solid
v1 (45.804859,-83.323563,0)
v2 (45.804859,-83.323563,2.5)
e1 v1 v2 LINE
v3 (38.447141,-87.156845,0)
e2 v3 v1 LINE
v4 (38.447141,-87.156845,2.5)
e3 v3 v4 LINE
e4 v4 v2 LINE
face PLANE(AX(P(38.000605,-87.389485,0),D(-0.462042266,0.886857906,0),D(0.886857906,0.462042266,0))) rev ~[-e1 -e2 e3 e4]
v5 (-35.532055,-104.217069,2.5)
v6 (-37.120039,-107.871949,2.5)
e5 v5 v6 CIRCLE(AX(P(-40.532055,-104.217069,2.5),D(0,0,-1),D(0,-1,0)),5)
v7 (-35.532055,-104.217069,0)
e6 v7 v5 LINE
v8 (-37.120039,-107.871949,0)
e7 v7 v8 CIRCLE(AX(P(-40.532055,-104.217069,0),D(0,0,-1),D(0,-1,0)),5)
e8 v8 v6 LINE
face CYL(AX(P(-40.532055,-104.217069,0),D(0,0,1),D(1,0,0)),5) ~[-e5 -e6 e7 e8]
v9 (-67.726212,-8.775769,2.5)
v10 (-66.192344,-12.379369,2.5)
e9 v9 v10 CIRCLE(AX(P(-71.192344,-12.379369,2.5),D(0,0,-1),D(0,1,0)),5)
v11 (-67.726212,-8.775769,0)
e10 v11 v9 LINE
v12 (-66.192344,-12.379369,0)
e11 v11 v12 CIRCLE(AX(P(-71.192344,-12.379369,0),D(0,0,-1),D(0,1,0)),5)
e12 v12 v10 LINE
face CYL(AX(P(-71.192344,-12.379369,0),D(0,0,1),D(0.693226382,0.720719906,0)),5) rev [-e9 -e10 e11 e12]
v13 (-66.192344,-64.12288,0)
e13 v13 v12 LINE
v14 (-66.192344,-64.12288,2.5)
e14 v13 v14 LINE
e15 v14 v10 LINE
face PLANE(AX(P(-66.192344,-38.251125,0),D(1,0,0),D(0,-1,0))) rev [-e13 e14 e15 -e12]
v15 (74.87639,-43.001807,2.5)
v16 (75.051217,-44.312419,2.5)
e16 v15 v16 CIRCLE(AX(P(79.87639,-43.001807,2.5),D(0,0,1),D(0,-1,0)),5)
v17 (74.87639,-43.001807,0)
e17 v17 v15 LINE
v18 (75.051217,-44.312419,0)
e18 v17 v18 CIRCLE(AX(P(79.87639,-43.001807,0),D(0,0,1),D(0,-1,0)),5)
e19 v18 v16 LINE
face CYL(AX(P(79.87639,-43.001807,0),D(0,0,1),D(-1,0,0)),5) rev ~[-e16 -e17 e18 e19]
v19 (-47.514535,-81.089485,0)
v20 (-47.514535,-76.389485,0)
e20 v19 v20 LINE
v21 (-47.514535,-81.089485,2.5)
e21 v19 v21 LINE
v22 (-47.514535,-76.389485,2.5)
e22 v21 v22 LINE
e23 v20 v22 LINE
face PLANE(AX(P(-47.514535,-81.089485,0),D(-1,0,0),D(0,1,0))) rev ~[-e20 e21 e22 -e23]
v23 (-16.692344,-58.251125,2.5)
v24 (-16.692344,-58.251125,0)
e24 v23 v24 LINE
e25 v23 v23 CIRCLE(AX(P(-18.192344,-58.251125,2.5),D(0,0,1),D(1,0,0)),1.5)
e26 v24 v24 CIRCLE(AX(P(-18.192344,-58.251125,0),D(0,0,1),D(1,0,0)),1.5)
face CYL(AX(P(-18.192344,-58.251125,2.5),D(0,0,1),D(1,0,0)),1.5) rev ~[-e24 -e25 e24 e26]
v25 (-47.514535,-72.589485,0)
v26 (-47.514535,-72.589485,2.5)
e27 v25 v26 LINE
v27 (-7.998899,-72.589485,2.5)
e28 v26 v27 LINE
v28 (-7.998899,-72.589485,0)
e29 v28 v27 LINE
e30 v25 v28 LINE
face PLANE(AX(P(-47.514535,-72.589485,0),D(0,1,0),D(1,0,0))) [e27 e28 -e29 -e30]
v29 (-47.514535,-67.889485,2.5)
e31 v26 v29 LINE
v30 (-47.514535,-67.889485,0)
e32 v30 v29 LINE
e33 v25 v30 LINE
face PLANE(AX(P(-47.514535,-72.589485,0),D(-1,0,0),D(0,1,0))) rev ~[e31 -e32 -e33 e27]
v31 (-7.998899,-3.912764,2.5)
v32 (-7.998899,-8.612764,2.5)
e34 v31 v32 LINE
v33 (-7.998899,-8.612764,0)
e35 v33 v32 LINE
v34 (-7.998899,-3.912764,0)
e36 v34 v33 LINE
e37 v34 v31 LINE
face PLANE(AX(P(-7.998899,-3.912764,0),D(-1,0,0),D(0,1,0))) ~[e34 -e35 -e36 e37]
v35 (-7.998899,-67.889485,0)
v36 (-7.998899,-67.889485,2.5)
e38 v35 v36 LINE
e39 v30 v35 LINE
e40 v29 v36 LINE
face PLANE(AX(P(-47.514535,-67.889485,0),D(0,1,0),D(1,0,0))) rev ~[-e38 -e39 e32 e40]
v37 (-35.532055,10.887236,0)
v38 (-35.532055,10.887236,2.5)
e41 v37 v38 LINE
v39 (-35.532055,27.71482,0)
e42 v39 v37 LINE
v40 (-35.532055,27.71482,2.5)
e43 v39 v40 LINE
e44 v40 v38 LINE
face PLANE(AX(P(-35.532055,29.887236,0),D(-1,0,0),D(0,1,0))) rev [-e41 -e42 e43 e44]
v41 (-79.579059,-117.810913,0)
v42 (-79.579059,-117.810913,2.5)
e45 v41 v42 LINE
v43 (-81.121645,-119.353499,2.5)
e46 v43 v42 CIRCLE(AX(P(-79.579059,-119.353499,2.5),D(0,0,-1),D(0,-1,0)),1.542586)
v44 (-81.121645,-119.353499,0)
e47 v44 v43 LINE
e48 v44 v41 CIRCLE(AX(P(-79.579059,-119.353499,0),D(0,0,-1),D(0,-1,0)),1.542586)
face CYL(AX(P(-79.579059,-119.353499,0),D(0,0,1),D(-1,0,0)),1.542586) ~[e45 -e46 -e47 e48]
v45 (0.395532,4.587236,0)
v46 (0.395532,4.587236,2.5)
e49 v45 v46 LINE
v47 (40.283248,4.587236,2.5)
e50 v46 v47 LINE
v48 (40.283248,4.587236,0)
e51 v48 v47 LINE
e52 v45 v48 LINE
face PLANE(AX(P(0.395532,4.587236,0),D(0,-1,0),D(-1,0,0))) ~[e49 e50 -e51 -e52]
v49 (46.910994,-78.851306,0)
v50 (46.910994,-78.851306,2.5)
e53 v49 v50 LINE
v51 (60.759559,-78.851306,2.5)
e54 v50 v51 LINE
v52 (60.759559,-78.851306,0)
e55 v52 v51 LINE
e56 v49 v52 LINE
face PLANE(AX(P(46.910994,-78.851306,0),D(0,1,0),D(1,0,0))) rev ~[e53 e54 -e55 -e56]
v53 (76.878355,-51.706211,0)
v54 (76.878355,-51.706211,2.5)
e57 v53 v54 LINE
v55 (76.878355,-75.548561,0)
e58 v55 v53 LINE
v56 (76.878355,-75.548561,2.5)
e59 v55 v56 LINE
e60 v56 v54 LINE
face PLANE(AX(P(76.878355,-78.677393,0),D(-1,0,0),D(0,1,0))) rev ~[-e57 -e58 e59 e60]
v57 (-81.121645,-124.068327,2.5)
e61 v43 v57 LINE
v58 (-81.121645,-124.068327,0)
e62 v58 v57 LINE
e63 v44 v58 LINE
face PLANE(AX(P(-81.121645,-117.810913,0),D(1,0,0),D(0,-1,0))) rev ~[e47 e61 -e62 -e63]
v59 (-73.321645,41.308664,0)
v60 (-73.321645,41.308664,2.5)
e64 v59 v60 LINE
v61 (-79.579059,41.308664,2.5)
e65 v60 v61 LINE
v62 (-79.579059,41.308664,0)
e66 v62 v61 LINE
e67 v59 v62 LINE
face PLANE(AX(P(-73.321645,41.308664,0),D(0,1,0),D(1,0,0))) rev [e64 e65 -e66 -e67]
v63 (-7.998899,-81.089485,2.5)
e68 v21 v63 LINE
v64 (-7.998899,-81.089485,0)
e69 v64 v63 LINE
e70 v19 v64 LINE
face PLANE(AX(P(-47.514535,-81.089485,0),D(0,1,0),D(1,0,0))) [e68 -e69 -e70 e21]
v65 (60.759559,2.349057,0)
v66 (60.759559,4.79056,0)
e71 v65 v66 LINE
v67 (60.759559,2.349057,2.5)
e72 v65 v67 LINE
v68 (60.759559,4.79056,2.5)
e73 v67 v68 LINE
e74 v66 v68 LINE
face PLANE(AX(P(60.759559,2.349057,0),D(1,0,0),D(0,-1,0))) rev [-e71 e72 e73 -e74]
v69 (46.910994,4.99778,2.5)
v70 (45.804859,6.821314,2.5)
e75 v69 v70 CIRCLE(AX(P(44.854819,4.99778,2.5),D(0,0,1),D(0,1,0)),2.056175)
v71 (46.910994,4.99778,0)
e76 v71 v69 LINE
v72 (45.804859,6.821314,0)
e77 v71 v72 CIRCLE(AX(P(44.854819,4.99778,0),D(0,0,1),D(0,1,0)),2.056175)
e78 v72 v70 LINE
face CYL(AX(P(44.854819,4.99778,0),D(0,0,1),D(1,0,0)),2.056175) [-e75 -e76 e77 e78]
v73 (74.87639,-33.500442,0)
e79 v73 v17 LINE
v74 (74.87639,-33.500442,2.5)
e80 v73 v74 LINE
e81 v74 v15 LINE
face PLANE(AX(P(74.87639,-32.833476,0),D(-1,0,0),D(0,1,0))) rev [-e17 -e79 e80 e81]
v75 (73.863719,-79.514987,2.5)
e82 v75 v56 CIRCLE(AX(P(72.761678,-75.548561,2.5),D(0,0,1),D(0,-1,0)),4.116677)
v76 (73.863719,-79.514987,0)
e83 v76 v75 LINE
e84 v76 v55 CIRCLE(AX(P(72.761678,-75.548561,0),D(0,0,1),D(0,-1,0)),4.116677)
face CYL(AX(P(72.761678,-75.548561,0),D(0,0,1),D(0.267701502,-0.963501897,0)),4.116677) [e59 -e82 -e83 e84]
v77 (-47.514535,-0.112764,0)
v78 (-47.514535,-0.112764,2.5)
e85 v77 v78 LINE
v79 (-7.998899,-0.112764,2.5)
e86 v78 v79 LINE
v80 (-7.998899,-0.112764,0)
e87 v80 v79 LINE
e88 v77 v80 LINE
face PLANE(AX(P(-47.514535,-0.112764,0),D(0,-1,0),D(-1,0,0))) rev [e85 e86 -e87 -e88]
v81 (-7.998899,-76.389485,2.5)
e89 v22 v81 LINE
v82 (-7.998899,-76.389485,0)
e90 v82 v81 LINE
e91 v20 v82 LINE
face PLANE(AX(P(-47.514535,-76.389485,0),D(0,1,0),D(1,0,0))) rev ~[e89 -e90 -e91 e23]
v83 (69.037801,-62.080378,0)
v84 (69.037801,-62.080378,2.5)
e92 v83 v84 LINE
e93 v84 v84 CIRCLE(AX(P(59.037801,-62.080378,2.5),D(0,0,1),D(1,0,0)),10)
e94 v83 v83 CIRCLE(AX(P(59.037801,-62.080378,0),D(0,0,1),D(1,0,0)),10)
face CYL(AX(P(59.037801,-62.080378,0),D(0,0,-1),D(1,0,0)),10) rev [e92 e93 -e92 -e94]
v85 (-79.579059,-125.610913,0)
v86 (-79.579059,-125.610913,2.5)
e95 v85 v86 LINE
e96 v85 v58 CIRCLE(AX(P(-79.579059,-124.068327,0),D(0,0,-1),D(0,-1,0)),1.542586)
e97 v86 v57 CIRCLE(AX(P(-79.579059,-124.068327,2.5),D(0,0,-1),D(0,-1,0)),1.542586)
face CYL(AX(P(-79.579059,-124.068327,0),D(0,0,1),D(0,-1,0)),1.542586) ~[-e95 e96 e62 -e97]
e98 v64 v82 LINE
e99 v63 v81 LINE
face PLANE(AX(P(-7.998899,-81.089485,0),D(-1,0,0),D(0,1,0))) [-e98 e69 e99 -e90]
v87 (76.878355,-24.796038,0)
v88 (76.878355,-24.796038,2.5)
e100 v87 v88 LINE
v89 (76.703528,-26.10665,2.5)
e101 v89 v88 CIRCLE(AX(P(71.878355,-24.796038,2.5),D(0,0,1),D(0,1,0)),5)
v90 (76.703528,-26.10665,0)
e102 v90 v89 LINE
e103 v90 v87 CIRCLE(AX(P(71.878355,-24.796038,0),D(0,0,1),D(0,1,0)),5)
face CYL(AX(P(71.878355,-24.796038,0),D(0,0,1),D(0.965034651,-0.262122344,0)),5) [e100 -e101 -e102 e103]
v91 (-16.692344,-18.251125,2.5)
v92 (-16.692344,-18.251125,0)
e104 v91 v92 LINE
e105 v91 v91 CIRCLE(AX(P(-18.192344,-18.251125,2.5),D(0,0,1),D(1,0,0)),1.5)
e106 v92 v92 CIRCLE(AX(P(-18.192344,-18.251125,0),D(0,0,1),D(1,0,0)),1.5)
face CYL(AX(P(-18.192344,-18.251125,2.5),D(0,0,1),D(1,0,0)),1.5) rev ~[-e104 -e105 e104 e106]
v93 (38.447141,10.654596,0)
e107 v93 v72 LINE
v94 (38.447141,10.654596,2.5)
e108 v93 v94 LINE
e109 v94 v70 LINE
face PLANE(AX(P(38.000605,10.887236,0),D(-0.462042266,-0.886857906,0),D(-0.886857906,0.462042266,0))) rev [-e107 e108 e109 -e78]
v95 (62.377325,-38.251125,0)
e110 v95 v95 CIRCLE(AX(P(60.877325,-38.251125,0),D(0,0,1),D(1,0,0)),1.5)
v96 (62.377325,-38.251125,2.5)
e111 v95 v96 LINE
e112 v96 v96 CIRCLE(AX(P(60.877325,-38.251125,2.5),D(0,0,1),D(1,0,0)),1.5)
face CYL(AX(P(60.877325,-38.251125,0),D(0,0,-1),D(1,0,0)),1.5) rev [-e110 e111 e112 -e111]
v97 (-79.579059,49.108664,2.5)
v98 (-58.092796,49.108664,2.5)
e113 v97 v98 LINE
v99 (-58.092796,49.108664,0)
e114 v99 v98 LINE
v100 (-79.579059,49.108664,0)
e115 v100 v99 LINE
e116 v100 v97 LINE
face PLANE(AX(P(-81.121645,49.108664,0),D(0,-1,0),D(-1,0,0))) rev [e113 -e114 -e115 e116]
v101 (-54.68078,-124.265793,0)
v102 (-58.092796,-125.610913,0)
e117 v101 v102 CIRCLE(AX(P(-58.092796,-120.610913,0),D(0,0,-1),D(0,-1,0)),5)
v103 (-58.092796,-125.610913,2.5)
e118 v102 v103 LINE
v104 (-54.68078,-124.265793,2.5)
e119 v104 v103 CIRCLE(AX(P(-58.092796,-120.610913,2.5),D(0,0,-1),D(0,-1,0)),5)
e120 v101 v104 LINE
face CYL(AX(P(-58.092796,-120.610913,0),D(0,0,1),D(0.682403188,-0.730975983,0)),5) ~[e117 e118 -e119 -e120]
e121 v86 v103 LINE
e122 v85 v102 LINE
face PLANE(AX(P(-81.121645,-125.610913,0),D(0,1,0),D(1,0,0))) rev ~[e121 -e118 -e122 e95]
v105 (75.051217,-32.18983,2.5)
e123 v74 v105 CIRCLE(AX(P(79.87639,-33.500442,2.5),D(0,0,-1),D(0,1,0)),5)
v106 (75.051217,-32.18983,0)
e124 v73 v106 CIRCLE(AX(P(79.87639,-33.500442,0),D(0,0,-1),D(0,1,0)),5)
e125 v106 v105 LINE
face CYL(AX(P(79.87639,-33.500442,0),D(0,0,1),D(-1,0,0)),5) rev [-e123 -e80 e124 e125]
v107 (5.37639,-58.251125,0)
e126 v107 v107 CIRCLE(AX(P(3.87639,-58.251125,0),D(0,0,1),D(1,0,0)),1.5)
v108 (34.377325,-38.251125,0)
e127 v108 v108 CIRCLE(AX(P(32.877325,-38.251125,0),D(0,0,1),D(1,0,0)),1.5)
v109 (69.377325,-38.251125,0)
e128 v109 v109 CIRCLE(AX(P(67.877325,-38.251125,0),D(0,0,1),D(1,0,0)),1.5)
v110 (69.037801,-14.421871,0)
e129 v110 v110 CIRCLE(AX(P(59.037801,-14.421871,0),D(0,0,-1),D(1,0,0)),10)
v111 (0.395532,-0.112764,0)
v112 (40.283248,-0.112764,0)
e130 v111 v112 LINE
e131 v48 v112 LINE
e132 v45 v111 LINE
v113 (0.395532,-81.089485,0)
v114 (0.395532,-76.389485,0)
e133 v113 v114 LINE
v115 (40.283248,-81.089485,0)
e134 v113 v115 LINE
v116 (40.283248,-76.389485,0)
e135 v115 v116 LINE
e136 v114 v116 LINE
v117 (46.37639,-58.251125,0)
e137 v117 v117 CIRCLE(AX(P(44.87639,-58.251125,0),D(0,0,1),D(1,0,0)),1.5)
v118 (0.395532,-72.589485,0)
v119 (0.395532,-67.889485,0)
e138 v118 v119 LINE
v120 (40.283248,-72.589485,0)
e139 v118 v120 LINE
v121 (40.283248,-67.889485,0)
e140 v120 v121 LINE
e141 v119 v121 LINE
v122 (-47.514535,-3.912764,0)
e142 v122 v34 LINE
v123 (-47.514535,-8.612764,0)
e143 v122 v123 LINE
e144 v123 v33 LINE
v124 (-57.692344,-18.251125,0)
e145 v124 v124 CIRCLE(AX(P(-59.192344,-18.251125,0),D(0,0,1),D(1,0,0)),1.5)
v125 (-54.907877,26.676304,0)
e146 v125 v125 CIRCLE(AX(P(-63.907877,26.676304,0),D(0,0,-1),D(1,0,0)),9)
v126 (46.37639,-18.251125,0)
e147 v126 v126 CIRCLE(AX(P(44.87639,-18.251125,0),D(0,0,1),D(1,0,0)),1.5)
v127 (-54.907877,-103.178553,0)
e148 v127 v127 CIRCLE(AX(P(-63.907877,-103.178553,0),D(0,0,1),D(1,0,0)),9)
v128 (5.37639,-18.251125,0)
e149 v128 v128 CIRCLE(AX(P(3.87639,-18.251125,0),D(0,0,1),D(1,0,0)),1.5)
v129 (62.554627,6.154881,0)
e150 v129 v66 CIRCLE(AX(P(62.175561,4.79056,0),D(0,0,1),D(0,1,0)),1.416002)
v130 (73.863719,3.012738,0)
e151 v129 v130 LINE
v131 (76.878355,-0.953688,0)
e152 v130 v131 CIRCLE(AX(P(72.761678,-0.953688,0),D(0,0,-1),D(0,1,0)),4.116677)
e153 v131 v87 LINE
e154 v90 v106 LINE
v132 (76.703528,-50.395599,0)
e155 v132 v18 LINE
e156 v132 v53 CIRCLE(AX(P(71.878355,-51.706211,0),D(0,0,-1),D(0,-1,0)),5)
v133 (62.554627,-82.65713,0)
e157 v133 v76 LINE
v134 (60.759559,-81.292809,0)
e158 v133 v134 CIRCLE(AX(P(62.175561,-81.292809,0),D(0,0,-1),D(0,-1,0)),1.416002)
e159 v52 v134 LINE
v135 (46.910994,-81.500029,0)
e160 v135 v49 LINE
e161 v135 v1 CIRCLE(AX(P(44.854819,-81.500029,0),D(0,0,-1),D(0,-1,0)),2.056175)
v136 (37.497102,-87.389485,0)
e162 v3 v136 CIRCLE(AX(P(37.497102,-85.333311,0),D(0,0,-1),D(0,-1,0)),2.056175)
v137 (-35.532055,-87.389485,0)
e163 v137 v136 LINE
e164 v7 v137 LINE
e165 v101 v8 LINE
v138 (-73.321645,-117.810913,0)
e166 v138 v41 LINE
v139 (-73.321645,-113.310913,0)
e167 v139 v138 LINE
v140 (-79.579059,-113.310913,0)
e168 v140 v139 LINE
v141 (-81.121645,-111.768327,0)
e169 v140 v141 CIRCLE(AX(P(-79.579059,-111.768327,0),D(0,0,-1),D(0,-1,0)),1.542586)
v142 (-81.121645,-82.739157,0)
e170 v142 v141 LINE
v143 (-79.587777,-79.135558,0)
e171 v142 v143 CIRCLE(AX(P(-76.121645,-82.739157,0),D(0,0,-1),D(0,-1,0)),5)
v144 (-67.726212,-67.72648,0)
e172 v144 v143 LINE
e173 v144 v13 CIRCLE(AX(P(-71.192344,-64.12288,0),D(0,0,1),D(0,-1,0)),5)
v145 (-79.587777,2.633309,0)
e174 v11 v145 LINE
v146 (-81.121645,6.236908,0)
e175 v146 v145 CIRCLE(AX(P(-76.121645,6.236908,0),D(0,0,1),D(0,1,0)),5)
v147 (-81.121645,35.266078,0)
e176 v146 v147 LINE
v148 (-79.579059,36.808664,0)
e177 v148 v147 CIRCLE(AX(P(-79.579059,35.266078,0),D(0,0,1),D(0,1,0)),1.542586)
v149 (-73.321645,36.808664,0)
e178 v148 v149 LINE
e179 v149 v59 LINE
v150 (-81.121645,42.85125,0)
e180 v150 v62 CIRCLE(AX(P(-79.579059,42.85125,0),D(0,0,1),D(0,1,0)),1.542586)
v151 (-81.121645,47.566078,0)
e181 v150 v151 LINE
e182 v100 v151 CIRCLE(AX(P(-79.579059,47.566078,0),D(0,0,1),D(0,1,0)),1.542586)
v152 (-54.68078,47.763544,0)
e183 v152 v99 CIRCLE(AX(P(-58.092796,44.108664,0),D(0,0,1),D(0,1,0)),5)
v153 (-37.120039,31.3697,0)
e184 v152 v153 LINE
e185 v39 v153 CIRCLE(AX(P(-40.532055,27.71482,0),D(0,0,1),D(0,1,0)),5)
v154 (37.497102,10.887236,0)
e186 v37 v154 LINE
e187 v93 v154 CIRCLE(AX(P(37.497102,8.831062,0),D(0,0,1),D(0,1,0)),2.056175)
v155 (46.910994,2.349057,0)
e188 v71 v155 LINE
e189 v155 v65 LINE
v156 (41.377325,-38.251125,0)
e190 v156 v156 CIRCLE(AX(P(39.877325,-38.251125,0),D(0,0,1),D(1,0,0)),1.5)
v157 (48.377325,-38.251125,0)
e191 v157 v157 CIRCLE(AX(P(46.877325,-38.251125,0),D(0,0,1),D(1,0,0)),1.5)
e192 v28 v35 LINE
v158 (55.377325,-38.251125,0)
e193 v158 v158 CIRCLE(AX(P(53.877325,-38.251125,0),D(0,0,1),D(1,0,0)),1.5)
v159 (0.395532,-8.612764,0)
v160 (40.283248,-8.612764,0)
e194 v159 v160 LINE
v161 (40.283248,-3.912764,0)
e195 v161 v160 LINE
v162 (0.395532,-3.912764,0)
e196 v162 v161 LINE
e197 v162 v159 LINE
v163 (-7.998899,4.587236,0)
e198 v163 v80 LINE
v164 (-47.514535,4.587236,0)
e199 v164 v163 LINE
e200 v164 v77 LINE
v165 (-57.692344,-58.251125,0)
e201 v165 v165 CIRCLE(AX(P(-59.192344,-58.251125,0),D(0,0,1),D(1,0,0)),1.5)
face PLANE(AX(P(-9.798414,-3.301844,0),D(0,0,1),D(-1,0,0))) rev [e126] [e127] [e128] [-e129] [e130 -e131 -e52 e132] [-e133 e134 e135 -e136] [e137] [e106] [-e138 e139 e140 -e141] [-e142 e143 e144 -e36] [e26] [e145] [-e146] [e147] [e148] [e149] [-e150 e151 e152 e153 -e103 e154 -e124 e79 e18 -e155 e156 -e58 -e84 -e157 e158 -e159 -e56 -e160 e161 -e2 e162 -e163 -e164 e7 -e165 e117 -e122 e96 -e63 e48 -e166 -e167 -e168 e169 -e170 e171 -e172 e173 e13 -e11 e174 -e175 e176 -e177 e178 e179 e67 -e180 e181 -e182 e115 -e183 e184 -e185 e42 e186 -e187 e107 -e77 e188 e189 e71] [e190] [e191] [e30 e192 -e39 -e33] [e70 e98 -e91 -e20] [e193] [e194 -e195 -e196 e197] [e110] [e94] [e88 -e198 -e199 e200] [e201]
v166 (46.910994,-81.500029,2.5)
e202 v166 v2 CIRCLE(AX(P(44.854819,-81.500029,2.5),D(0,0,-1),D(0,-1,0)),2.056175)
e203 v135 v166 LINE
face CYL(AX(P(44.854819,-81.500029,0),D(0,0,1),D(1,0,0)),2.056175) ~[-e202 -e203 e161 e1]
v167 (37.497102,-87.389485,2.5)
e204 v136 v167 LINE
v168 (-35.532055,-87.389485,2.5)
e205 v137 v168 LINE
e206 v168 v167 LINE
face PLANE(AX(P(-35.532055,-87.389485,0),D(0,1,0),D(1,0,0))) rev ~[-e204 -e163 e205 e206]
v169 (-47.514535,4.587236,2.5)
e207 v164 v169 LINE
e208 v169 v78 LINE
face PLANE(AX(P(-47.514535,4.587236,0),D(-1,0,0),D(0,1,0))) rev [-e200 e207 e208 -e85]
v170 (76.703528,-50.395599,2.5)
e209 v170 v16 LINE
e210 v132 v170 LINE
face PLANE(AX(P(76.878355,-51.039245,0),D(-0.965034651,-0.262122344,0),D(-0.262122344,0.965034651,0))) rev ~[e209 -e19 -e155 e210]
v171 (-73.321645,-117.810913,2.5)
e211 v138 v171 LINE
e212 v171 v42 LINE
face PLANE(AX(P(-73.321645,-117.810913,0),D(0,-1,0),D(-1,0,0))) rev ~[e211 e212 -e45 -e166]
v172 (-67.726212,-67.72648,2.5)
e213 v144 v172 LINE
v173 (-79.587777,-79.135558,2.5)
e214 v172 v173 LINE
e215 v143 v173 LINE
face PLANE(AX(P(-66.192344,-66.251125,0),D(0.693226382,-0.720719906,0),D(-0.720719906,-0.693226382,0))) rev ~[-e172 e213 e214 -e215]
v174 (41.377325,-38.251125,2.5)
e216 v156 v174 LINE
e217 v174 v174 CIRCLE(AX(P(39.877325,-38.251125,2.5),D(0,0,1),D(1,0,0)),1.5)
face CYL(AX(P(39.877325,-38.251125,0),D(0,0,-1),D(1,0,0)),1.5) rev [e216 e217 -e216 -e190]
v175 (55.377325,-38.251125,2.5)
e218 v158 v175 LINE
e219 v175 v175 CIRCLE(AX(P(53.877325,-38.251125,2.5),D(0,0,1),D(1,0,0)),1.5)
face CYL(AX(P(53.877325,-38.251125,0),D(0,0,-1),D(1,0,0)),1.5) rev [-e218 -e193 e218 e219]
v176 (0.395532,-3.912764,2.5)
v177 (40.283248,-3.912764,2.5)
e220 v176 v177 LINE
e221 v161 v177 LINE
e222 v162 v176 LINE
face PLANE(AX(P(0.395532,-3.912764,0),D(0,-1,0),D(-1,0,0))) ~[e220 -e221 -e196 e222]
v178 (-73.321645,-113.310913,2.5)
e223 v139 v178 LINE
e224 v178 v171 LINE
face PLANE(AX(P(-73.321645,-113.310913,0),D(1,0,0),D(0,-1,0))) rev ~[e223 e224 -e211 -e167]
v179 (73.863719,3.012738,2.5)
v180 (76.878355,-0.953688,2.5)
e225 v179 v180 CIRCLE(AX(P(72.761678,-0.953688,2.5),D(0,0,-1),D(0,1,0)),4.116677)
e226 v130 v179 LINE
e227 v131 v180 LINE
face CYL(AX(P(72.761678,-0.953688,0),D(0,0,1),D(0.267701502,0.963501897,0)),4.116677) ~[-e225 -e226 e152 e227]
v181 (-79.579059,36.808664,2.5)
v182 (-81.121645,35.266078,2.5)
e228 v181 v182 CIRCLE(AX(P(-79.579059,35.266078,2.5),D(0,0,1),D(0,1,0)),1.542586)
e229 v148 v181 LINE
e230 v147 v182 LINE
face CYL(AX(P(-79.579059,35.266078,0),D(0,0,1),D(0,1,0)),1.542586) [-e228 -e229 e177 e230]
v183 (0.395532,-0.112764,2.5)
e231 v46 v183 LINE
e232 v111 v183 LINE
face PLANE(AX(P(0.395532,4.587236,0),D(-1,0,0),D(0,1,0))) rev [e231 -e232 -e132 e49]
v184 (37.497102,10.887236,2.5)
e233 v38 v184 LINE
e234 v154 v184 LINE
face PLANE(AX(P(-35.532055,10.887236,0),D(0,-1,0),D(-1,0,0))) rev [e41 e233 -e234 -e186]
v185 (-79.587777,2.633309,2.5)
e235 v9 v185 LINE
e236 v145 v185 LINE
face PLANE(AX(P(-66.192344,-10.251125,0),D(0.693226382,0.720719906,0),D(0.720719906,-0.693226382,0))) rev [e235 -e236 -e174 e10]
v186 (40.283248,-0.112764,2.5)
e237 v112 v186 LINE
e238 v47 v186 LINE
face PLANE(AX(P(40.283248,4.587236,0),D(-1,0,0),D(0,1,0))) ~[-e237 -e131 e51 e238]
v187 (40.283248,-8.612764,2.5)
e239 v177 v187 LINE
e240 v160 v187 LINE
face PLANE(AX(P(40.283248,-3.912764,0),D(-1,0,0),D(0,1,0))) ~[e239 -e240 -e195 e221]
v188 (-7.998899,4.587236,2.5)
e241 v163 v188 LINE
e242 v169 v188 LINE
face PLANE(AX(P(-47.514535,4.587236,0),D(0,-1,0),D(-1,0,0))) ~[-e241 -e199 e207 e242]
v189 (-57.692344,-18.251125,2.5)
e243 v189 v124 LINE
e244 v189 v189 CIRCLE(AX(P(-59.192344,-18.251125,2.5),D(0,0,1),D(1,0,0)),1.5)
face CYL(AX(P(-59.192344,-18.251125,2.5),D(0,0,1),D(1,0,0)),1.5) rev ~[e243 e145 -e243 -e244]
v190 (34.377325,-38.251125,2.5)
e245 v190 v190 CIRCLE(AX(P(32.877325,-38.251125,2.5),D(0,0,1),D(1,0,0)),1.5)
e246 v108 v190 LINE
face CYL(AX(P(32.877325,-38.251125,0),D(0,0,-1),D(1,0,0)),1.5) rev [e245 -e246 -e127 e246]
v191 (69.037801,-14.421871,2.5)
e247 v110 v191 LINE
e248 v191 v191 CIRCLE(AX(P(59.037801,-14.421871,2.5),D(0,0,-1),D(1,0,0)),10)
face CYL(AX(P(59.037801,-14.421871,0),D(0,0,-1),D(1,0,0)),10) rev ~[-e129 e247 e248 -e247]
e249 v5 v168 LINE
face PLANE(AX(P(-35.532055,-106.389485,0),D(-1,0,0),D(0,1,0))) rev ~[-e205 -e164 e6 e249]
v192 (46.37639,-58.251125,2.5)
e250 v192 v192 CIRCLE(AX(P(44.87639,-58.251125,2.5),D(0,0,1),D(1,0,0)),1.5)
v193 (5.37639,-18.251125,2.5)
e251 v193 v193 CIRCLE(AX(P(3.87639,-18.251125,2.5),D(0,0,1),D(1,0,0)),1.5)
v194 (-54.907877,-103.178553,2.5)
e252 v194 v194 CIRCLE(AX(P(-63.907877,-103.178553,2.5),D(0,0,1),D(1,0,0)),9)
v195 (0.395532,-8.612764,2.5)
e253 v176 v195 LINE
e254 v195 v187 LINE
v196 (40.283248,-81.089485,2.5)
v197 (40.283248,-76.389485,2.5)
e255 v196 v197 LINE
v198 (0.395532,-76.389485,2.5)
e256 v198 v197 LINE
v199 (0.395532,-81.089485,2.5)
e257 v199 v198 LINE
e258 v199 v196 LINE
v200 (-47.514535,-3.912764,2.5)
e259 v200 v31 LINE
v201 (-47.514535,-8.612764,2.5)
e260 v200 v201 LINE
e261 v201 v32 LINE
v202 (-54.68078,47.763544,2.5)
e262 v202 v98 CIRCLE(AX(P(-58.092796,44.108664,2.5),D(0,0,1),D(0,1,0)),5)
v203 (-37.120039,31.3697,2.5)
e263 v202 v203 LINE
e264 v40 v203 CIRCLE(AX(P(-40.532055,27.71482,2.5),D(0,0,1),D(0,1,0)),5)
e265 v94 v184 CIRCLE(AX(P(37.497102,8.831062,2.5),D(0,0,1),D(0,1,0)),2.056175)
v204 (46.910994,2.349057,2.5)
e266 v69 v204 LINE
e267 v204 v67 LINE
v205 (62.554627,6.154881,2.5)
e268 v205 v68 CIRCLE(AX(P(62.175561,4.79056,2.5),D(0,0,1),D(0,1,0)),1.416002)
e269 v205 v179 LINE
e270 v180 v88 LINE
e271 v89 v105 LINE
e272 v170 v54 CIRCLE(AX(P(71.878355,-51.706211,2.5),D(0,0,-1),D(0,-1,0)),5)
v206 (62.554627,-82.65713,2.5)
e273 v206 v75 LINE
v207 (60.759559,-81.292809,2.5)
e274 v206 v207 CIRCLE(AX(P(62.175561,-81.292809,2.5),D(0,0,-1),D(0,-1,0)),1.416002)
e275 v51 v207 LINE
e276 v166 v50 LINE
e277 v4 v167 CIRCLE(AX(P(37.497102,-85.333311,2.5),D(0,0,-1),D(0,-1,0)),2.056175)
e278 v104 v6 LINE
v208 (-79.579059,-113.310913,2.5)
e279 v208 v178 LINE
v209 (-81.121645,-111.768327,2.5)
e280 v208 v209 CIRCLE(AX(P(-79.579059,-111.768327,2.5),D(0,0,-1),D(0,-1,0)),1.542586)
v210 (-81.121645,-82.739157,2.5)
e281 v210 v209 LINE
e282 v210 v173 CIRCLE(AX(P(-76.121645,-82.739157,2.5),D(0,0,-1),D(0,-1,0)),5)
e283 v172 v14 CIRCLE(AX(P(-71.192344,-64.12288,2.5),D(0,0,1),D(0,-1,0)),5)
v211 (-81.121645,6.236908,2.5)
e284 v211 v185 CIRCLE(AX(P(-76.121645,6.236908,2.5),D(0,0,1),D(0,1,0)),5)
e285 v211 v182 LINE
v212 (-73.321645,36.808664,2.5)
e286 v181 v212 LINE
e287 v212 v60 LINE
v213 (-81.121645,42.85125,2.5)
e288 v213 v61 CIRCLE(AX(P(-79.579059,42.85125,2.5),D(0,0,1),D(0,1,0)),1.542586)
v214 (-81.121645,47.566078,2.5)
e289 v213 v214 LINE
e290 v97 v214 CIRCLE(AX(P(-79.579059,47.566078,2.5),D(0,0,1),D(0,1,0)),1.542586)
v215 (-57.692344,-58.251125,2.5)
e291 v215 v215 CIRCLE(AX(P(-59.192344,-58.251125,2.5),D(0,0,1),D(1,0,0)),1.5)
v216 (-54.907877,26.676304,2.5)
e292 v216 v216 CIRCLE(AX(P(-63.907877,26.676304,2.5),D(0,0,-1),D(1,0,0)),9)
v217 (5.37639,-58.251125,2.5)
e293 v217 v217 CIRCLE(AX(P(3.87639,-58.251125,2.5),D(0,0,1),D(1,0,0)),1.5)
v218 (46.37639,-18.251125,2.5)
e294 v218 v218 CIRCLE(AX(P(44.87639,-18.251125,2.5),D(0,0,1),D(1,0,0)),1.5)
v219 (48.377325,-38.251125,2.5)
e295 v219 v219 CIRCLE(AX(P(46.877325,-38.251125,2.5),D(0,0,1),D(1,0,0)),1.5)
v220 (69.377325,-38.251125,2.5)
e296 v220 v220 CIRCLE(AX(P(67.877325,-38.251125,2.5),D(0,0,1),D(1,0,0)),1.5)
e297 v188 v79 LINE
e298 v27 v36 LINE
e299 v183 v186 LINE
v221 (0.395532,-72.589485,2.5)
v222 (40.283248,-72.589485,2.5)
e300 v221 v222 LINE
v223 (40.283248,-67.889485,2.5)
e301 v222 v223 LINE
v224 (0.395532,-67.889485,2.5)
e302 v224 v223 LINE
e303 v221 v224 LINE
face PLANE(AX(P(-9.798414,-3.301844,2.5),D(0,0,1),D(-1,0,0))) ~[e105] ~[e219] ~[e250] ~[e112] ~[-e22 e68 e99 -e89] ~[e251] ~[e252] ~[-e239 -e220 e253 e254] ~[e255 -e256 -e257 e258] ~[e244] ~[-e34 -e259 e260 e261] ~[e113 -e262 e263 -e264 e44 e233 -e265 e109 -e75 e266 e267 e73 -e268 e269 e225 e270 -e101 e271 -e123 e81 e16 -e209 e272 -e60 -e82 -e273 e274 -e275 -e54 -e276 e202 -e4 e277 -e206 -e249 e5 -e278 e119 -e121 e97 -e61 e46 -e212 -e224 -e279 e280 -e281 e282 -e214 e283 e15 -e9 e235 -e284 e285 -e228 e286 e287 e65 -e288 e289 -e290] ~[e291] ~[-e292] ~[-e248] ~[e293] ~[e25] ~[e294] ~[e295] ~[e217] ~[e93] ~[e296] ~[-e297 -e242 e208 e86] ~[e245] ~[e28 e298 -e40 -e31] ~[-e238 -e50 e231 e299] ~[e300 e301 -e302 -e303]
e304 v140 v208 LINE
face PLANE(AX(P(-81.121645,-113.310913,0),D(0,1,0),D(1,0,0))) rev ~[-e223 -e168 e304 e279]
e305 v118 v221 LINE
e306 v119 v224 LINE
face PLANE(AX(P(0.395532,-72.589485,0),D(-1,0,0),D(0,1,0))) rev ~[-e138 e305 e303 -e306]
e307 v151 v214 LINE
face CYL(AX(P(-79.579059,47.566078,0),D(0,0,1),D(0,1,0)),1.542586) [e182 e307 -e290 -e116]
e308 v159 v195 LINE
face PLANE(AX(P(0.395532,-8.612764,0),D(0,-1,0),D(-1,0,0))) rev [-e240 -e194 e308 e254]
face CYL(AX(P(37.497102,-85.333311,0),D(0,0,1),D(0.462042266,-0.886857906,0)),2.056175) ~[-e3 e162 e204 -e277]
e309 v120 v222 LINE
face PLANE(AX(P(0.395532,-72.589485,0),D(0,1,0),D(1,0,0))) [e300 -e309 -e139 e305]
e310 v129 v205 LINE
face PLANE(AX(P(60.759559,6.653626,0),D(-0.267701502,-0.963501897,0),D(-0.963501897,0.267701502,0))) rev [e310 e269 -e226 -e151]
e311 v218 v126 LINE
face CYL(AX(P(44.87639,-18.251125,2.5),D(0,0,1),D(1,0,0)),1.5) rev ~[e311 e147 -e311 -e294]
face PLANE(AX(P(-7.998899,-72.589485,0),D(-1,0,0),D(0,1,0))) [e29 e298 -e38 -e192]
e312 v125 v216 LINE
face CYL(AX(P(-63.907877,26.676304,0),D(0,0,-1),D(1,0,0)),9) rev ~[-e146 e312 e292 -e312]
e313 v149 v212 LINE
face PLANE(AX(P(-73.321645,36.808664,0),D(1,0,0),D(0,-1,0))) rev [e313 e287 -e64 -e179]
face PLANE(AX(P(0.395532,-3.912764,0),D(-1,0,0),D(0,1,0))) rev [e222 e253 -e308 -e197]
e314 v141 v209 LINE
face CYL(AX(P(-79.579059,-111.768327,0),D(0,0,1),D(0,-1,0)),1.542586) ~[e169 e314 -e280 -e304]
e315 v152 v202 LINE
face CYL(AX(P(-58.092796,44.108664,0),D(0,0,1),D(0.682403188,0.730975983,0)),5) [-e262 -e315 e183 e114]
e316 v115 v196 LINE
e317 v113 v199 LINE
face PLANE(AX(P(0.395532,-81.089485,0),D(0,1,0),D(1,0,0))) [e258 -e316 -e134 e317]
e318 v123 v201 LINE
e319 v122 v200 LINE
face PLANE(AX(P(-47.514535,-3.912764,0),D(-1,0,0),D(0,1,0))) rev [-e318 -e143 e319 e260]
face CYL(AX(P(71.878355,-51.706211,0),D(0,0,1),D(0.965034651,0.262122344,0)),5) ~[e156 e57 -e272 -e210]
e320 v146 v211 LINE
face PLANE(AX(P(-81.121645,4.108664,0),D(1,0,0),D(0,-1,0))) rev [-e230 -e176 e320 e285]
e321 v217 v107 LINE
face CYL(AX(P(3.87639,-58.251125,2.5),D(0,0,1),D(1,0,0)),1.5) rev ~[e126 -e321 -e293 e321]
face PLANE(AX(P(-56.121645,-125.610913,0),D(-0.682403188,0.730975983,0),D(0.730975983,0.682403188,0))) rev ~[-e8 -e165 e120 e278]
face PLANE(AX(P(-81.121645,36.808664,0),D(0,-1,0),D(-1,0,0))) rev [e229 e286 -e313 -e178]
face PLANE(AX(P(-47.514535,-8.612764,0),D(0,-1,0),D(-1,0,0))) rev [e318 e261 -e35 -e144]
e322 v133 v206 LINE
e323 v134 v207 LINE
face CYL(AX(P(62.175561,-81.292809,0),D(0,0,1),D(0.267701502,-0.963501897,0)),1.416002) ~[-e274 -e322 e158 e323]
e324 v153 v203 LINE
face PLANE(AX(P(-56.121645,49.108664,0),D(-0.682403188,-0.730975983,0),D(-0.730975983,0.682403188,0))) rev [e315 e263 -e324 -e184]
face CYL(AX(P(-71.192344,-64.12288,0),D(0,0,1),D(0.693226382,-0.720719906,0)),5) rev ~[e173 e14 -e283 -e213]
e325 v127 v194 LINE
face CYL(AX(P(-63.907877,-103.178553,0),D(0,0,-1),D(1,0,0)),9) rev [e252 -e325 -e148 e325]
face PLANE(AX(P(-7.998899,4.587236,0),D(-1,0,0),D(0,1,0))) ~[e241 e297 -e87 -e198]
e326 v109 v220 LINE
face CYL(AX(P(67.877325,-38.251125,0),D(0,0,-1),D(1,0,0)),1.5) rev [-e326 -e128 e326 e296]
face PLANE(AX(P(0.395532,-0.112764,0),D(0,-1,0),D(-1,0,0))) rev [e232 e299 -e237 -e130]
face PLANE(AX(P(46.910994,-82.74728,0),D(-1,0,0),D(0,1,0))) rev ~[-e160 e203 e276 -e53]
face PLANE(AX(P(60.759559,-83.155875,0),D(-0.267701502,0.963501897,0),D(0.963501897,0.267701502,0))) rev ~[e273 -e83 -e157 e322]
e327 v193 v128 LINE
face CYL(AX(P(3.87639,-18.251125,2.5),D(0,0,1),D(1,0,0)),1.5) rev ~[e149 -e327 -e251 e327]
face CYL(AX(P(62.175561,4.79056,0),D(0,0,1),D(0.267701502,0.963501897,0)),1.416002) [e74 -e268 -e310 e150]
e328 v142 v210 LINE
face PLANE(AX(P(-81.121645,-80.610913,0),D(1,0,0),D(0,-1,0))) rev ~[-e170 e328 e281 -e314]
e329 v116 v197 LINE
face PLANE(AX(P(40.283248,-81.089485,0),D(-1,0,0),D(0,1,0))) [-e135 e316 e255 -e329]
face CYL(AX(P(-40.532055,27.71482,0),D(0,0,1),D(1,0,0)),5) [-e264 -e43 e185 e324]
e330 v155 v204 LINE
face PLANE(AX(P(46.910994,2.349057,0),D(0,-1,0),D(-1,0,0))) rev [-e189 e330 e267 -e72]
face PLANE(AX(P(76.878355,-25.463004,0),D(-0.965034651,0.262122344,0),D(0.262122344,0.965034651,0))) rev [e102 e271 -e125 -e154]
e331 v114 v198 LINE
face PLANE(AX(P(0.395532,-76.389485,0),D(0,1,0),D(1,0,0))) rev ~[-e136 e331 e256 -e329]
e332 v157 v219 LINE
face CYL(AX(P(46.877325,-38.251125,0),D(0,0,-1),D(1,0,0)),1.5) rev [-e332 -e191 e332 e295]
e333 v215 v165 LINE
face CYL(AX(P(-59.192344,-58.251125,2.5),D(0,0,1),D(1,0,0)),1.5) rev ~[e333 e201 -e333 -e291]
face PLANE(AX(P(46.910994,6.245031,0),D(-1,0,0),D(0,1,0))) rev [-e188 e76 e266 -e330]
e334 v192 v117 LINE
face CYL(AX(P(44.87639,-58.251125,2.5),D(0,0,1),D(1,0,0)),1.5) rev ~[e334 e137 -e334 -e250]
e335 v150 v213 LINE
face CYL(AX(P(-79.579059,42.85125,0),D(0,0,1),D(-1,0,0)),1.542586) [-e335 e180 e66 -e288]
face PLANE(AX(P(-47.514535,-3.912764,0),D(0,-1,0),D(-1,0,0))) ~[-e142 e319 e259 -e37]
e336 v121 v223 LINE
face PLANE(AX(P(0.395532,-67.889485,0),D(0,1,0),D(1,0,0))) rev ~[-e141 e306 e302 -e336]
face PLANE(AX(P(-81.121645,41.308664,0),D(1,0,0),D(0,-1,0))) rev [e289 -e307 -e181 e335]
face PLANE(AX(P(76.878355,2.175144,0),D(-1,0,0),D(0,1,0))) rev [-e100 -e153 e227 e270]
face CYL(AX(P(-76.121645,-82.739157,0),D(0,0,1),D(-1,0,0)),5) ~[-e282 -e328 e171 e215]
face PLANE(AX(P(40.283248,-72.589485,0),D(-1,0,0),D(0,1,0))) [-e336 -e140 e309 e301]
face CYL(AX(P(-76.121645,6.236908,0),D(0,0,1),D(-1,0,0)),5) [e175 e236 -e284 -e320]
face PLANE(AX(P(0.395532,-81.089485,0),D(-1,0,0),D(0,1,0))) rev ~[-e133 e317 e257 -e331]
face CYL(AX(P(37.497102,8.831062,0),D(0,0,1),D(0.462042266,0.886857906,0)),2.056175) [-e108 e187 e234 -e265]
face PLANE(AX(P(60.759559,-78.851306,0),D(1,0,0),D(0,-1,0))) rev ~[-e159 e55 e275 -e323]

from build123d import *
from build123d import SkipClean  # not in build123d's __all__

# Parameters (mm, degrees)
F0_R      = 9
F0_W      = 39.5156368613
F0_H      = 4.7
F0_W_2    = 39.887715684
F0_R_2    = 10
F1_DEPTH  = 2.5
F2_R      = 1.4160019586
F3_R      = 4.1166770091
F4_R      = 2.0561745665
F5_R      = 5
F6_R      = 1.5425858978
F7_R      = 5
F8_R      = 5
F10_R     = 1.5
F11_DEPTH = 25


with BuildPart() as f1:
    # F0 (on Top) → F1 (new body)
    with BuildSketch(Plane.XY):
        with BuildLine():
            Line((74.8763903975, -38.2511245025), (69.3773250177, -38.2511245025))
            ThreePointArc((69.3773250177, -38.2511245025), (67.8773250177, -39.7511245025), (66.3773250177, -38.2511245025))
            Line((66.3773250177, -38.2511245025), (62.3773250177, -38.2511245025))
            ThreePointArc((62.3773250177, -38.2511245025), (60.8773250177, -39.7511245025), (59.3773250177, -38.2511245025))
            Line((59.3773250177, -38.2511245025), (55.3773250177, -38.2511245025))
            ThreePointArc((55.3773250177, -38.2511245025), (53.8773250177, -39.7511245025), (52.3773250177, -38.2511245025))
            Line((52.3773250177, -38.2511245025), (48.3773250177, -38.2511245025))
            ThreePointArc((48.3773250177, -38.2511245025), (46.8773250177, -39.7511245025), (45.3773250177, -38.2511245025))
            Line((45.3773250177, -38.2511245025), (41.3773250177, -38.2511245025))
            ThreePointArc((41.3773250177, -38.2511245025), (39.8773250177, -39.7511245025), (38.3773250177, -38.2511245025))
            Line((38.3773250177, -38.2511245025), (34.3773250177, -38.2511245025))
            ThreePointArc((34.3773250177, -38.2511245025), (32.8773250177, -39.7511245025), (31.3773250177, -38.2511245025))
            Line((31.3773250177, -38.2511245025), (-66.1923438311, -38.2511245025))
            Line((-66.1923438311, -38.2511245025), (-66.1923438311, -66.2511245025))
            Line((-66.1923438311, -66.2511245025), (-81.1216448216, -80.6109128623))
            Line((-81.1216448216, -80.6109128623), (-81.1216448216, -113.3109128623))
            Line((-81.1216448216, -113.3109128623), (-73.3216448216, -113.3109128623))
            Line((-73.3216448216, -113.3109128623), (-73.3216448216, -117.8109128623))
            Line((-73.3216448216, -117.8109128623), (-81.1216448216, -117.8109128623))
            Line((-81.1216448216, -117.8109128623), (-81.1216448216, -125.6109128623))
            Line((-81.1216448216, -125.6109128623), (-56.1216448216, -125.6109128623))
            Line((-56.1216448216, -125.6109128623), (-35.532054749, -106.3894852996))
            Line((-35.532054749, -106.3894852996), (-35.532054749, -87.3894852996))
            Line((-35.532054749, -87.3894852996), (38.0006051308, -87.3894852996))
            Line((38.0006051308, -87.3894852996), (46.9109937549, -82.7472803621))
            Line((46.9109937549, -82.7472803621), (46.9109937549, -78.8513062))
            Line((46.9109937549, -78.8513062), (60.7595592737, -78.8513062))
            Line((60.7595592737, -78.8513062), (60.7595592737, -83.155875459))
            Line((60.7595592737, -83.155875459), (76.8783551784, -78.677393496))
            Line((76.8783551784, -78.677393496), (76.8783551784, -51.0392449796))
            Line((76.8783551784, -51.0392449796), (74.8763903975, -43.6687730253))
            Line((74.8763903975, -43.6687730253), (74.8763903975, -38.2511245025))
        make_face()
        with Locations((-63.9078766108, -103.1785532832)):
            Circle(F0_R, mode=Mode.SUBTRACT)
        with Locations((-27.756717056, -78.7394852996)):
            Rectangle(F0_W, F0_H, mode=Mode.SUBTRACT)
        with Locations((-27.756717056, -70.2394852996)):
            Rectangle(F0_W, F0_H, mode=Mode.SUBTRACT)
        with Locations((20.3393899865, -78.7394852996)):
            Rectangle(F0_W_2, F0_H, mode=Mode.SUBTRACT)
        with Locations((20.3393899865, -70.2394852996)):
            Rectangle(F0_W_2, F0_H, mode=Mode.SUBTRACT)
        with Locations((59.0378009468, -62.0803784949)):
            Circle(F0_R_2, mode=Mode.SUBTRACT)
    extrude(amount=F1_DEPTH)

    # F2
    f2_edges = [f1.edges().sort_by_distance(p)[0] for p in [
        (60.759559, -83.155875, 1.25),
    ]]
    fillet(f2_edges, radius=F2_R)

    # F3
    f3_edges = [f1.edges().sort_by_distance(p)[0] for p in [
        (76.878355, -78.677393, 1.25),
    ]]
    fillet(f3_edges, radius=F3_R)

    # F4
    f4_edges = [f1.edges().sort_by_distance(p)[0] for p in [
        (46.910994, -82.74728, 1.25),
        (38.000605, -87.389485, 1.25),
    ]]
    fillet(f4_edges, radius=F4_R)

    # F5
    f5_edges = [f1.edges().sort_by_distance(p)[0] for p in [
        (-56.121645, -125.610913, 1.25),
        (-35.532055, -106.389485, 1.25),
    ]]
    fillet(f5_edges, radius=F5_R)

    # F6
    f6_edges = [f1.edges().sort_by_distance(p)[0] for p in [
        (-81.121645, -113.310913, 1.25),
        (-81.121645, -117.810913, 1.25),
        (-81.121645, -125.610913, 1.25),
    ]]
    fillet(f6_edges, radius=F6_R)

    # F7
    f7_edges = [f1.edges().sort_by_distance(p)[0] for p in [
        (-81.121645, -80.610913, 1.25),
        (-66.192344, -66.251125, 1.25),
    ]]
    fillet(f7_edges, radius=F7_R)

    # F8
    f8_edges = [f1.edges().sort_by_distance(p)[0] for p in [
        (76.878355, -51.039245, 1.25),
        (74.87639, -43.668773, 1.25),
    ]]
    fillet(f8_edges, radius=F8_R)

    # F9: F1 across face


with BuildPart() as f1_1:
    add(f1.part, clean=False)
    with SkipClean():  # cleaning this boolean's faces spoils the solid; the shape is the same uncleaned
        add(f1.part.mirror(Plane(origin=(-17.4075094067, -38.2511245025, 1.25), x_dir=(-1, 0, 0), z_dir=(0, 1, 0))), clean=False)

    # F10 (on face) → F11 (cut)
    with BuildSketch(Plane.XY.offset(2.5)):
        with Locations((-59.1923438311, -18.2511245025)):
            Circle(F10_R)
        with Locations((-18.1923438311, -18.2511245025)):
            Circle(F10_R)
        with Locations((-18.1923438311, -58.2511245025)):
            Circle(F10_R)
        with Locations((-59.1923438311, -58.2511245025)):
            Circle(F10_R)
        with Locations((3.8763903975, -18.2511245025)):
            Circle(F10_R)
        with Locations((3.8763903975, -58.2511245025)):
            Circle(F10_R)
        with Locations((44.8763903975, -58.2511245025)):
            Circle(F10_R)
        with Locations((44.8763903975, -18.2511245025)):
            Circle(F10_R)
    extrude(amount=-F11_DEPTH, mode=Mode.SUBTRACT)


solid = f1_1.part
